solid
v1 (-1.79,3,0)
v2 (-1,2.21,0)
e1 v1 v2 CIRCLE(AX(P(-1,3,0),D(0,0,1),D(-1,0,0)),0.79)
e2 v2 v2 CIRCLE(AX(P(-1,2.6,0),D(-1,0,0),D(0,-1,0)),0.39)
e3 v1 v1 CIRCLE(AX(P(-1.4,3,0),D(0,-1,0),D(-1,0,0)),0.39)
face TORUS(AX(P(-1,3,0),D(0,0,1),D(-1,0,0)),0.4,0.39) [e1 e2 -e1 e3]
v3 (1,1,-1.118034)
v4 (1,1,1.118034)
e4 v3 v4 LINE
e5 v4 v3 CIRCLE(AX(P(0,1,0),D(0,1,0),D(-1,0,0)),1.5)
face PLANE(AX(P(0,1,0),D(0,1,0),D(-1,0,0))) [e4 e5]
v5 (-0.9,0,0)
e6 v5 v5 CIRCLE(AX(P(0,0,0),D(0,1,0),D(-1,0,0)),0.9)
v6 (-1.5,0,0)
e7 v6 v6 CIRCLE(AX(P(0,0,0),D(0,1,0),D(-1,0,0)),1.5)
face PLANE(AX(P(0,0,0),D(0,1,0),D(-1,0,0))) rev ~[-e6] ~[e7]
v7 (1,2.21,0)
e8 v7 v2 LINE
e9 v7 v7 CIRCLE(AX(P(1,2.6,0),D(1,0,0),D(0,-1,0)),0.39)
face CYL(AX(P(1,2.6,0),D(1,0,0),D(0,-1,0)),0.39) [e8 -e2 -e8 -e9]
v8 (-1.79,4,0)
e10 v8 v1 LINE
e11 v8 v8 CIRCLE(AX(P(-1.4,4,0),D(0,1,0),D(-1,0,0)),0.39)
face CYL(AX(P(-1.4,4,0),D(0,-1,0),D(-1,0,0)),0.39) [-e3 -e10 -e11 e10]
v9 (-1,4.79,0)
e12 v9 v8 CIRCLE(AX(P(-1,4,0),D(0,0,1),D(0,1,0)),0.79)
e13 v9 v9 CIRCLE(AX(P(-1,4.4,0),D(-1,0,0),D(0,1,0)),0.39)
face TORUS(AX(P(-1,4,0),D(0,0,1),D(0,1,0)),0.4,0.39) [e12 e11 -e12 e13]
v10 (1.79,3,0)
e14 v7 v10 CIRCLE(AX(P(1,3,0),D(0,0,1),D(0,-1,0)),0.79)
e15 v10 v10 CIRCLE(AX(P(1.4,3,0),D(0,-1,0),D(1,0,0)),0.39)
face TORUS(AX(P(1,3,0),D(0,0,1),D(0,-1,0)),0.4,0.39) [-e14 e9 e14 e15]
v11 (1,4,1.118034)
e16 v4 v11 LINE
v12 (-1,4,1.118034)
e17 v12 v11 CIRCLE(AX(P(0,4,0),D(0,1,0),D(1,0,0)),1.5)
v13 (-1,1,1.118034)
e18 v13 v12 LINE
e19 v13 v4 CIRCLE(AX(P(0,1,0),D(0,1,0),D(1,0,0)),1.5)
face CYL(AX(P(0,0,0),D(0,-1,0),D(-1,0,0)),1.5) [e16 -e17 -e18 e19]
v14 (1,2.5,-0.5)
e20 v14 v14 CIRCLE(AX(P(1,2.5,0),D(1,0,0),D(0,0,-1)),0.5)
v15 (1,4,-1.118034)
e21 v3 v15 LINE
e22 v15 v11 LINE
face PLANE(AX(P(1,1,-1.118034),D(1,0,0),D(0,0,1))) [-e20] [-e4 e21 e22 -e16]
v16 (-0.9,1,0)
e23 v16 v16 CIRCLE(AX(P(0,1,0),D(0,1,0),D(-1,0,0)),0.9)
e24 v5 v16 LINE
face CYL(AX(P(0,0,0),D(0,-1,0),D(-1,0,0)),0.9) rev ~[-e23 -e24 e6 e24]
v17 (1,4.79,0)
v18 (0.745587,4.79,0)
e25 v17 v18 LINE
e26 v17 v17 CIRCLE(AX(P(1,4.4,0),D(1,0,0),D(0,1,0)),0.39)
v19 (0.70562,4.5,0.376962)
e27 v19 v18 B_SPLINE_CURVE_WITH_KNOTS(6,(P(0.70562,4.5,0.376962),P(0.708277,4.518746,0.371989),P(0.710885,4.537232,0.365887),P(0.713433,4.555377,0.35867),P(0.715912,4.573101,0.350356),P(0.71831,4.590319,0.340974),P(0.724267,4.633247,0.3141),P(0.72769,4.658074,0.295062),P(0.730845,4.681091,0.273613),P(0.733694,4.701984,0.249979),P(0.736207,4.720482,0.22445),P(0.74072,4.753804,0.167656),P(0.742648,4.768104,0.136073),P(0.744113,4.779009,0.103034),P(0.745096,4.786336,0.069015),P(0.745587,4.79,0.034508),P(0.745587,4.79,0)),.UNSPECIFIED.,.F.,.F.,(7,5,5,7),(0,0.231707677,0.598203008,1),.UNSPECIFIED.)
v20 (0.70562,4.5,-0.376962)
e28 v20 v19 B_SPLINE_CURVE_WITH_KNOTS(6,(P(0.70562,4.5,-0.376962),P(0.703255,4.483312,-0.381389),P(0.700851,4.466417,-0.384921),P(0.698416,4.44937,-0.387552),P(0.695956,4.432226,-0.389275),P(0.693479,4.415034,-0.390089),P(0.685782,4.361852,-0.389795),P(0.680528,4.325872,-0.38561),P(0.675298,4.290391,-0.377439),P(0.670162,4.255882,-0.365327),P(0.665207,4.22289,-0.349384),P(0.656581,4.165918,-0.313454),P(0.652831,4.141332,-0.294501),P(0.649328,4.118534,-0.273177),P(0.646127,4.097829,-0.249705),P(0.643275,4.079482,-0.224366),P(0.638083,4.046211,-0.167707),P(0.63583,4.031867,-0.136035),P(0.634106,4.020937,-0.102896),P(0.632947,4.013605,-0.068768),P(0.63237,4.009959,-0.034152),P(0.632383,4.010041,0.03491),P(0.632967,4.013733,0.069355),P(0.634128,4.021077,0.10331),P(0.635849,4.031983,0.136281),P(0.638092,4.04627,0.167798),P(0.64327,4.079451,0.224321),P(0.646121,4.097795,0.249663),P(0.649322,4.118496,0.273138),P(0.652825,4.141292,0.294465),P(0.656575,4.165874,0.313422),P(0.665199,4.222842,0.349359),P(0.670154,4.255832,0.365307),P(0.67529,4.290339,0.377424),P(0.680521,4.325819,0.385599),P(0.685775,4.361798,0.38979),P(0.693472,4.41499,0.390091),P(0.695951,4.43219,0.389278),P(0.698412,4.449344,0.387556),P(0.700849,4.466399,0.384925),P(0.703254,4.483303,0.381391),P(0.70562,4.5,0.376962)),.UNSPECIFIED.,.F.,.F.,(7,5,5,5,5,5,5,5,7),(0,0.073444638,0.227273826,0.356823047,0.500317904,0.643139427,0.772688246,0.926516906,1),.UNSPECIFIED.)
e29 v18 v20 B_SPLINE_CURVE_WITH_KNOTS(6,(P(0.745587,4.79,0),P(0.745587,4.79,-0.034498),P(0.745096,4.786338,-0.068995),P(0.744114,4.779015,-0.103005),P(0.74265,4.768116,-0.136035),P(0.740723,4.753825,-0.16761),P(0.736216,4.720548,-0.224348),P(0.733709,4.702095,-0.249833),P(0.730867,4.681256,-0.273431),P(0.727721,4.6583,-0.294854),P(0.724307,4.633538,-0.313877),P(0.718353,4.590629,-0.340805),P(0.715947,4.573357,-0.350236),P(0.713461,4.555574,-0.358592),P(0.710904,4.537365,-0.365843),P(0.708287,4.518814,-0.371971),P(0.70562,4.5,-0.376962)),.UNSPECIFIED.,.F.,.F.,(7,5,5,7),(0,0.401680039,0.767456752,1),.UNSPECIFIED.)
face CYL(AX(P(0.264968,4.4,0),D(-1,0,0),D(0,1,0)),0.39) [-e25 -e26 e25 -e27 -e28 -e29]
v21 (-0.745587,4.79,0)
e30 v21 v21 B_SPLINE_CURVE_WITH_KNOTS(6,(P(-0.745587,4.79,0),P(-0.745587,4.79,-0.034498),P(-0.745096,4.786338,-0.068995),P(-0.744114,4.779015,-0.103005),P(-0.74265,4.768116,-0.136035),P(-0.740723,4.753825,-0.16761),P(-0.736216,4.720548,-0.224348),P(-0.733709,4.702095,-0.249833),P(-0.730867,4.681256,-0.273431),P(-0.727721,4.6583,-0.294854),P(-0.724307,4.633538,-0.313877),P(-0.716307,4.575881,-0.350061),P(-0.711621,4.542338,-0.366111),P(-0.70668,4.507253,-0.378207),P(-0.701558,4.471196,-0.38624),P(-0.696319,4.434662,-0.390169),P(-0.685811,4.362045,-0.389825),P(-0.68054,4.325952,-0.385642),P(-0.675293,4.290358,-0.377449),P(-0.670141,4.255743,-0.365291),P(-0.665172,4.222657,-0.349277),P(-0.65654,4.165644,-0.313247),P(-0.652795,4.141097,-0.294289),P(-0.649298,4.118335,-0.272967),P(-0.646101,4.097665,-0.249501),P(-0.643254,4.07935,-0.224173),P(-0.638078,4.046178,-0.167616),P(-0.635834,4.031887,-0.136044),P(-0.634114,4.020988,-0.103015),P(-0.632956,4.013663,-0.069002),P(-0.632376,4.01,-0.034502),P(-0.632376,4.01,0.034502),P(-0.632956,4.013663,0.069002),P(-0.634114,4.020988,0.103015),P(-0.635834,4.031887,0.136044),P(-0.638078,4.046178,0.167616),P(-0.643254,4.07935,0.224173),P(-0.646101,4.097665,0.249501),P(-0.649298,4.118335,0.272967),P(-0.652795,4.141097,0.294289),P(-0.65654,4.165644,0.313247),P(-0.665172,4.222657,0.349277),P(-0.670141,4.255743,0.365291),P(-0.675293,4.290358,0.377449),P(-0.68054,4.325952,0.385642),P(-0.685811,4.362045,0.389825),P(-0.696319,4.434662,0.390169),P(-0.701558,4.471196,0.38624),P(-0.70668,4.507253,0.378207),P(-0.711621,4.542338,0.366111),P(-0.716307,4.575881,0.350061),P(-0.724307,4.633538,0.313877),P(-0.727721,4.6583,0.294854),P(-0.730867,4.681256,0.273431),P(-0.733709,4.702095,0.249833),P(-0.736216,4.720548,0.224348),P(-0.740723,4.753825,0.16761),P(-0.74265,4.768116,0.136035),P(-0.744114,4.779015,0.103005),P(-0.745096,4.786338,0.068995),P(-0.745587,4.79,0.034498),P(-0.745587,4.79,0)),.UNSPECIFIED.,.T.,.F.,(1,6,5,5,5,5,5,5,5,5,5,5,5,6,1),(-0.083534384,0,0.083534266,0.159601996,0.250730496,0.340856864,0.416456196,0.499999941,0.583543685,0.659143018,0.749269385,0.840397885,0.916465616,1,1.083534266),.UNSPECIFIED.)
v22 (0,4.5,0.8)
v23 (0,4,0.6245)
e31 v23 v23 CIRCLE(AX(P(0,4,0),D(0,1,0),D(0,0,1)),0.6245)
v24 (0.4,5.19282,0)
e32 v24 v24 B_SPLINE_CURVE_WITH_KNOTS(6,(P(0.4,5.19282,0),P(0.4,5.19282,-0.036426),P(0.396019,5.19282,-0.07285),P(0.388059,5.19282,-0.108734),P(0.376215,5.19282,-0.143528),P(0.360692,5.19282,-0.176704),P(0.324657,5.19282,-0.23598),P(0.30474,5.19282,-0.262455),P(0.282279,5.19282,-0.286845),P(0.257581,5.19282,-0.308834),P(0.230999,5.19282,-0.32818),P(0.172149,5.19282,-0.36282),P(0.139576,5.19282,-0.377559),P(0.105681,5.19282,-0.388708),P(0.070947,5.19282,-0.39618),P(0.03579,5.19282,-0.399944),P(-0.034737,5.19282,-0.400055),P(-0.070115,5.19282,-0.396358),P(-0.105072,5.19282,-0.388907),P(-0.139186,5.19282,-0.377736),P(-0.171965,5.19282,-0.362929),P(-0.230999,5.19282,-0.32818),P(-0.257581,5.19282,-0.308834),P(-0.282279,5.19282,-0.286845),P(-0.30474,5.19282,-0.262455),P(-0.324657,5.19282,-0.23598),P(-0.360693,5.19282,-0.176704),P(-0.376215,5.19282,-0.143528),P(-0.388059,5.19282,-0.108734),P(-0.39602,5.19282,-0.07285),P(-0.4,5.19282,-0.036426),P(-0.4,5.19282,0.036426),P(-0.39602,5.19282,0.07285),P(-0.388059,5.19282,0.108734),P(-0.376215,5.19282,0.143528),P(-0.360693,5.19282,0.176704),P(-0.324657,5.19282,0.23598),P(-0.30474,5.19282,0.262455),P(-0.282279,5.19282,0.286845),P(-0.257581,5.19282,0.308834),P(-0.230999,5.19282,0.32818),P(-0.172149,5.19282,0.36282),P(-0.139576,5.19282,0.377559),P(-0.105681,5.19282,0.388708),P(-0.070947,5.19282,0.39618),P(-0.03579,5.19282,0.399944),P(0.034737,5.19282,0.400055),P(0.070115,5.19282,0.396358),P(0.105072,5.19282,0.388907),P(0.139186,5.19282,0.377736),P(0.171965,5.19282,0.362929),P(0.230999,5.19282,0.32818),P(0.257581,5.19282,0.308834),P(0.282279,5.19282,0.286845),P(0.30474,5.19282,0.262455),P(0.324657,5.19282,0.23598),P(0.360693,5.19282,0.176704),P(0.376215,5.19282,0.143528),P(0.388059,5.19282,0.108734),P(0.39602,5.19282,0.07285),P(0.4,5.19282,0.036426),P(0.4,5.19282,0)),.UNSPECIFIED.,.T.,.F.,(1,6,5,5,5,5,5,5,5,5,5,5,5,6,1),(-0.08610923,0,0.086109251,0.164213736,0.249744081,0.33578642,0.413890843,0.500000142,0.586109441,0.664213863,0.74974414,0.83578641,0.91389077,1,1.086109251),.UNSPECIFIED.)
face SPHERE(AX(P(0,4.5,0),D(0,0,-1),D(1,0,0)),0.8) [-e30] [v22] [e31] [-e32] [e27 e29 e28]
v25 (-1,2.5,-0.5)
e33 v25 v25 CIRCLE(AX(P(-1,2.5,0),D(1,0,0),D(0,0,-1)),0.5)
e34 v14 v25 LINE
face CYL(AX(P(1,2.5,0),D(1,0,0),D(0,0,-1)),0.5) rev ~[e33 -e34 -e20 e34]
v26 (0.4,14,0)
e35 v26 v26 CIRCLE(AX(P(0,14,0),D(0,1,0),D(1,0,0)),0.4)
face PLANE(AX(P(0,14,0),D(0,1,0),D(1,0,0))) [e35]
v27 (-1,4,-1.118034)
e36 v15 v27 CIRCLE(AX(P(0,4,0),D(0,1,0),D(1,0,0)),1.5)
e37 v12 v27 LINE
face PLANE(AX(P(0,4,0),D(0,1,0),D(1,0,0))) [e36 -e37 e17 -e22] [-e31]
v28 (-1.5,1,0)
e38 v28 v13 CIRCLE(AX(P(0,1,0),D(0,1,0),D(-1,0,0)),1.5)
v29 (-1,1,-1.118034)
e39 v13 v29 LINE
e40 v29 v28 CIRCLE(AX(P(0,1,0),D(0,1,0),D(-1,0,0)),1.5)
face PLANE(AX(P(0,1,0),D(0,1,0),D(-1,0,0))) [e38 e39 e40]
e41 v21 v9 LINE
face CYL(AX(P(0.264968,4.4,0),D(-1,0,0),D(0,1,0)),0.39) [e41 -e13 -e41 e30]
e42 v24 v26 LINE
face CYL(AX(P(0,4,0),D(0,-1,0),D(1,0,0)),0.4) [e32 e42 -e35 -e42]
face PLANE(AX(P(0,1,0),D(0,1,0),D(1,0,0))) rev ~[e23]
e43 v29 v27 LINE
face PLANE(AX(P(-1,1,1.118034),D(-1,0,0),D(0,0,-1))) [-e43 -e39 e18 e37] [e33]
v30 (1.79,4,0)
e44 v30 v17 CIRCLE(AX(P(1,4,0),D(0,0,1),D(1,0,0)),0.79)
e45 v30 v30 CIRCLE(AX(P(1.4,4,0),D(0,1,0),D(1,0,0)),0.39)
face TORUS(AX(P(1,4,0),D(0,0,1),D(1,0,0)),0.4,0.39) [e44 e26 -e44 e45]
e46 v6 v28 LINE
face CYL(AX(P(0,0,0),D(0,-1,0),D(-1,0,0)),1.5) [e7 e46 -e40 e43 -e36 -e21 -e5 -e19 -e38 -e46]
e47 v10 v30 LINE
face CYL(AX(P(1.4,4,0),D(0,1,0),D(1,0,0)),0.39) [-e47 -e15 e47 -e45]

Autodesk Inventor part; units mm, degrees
ref_plane "YZ Plane" through (0, 0, 0) normal (1, 0, 0) x (0, 1, 0)
ref_plane "XZ Plane" through (0, 0, 0) normal (0, 1, 0) x (-1, 0, 0)
sketch "스케치2" plane through (0, 0, 0) normal (0, 1, 0) x (-1, 0, 0)
  circle A0 centre (0, 0) radius 1.5
  circle A1 centre (0, 0) radius 0.9
  dimension "d0" = 3
  dimension "d6" = 1.8
extrude "돌출1" add sketch "스케치2" along normal blind 1
sketch "스케치4" plane through (0, 1, 0) normal (0, 1, 0) x (1, 0, 0)
  line L0 (1, -3.1) -> (-1, -3.1)
  line L1 (-1, -3.1) -> (-1, 3.1)
  line L2 (-1, 3.1) -> (1, 3.1)
  line L3 (1, 3.1) -> (1, -3.1)
  line L4 (1, -3.1) -> (-1, 3.1) construction
  line L5 (-1, -3.1) -> (1, 3.1) construction
  circle A0 centre (0, 0) radius 1.5 projected
  point P0 (1, 1.118034)
  point P1 (-1, 1.118034)
  point P2 (-1, -1.118034)
  point P3 (1, -1.118034)
  dimension "d7" = 2
extrude "돌출5" add sketch "스케치4" along normal blind 3 contours A0 L1 L3
sketch "스케치6" plane through (1, 1, 1.118034) normal (1, 0, 0) x (0, 0, -1)
  circle A0 centre (1.118034, 1.5) radius 0.5
  line L0 (0, 3) -> (2.236068, 3)
  point P0 (1.118034, -1)
  dimension "d22" = 1
  dimension "d23" = 1.5
extrude "돌출6" cut sketch "스케치6" along normal through all both and the other way through all
sketch "Sketch7" plane through (0, 4, 0) normal (0, 1, 0) x (1, 0, 0)
  circle A0 centre (0, 0) radius 0.4
  dimension "d26" = 0.8
extrude "Extrusion7" add sketch "Sketch7" along normal blind 10
sketch "Sketch8" plane through (0, 0, 0) normal (0, 0, 1) x (1, 0, 0)
  line L0 (0.264968, 4.4) -> (-1, 4.4)
  line L1 (-1.4, 4) -> (-1.4, 3)
  line L2 (-1, 2.6) -> (0.264968, 2.6)
  line L3 (1, 4) -> (-1, 4)
  line L4 (0.264968, 4.4) -> (1, 4.4)
  line L5 (1.4, 4) -> (1.4, 3)
  line L6 (1, 2.6) -> (0.264968, 2.6)
  line L7 (1, 1) -> (1, 4)
  line L8 (-1, 1) -> (-1, 4)
  arc A0 (-1, 4.4) -> (-1.4, 4) centre (-1, 4) ccw
  arc A1 (1.4, 4) -> (1, 4.4) centre (1, 4) ccw
  line L9 (-1, 3) -> (1, 3)
  arc A2 (-1.4, 3) -> (-1, 2.6) centre (-1, 3) ccw
  arc A3 (1, 2.6) -> (1.4, 3) centre (1, 3) ccw
  point P0 (0, 0)
  dimension "d29" = 0.4
  dimension "d30" = 1.4
  dimension "d32" = 0.4
  dimension "d33" = 0.4
sketch "Sketch9" plane through (0, 0, 0) normal (1, 0, 0) x (0, 1, 0)
  circle A0 centre (4.4, 0) radius 0.39
  line L0 (14, -0.4) -> (14, 0.4) projected
  line L1 (4, 0.4) -> (4, -0.4) projected
  point P0 (0, 0)
  dimension "d34" = 0.78
sweep "Sweep1" add profiles "Sketch9" path "Sketch8" path curves L0 A0 L1 A2 L2 L6 A3 L5 A1 L4
ref_plane "Work Plane2" through (0, 4.5, 0) normal (0, 1, 0) x (1, 0, 0)
sketch "Sketch11" plane through (0, 4.5, 0) normal (0, 1, 0) x (1, 0, 0)
  circle A0 centre (0, 0) radius 0.9 projected
  circle A1 centre (0, 0) radius 0.8
  line L0 (0, -0.8) -> (0, 0.8)
  dimension "d40" = 1.6
sketch "Sketch11 outline for Revolution2" plane through (0, 4.5, 0) normal (0, 1, 0) x (1, 0, 0)
  line L0 (0, 0.8) -> (0, -0.8)
  arc A0 (0, -0.8) -> (0, 0.8) centre (0, 0) ccw
revolve "Revolution2" add sketch "Sketch11 outline for Revolution2" angle 360 about axis through (0, 4.5, 0.8) along (0, 0, -1)
properties part number "dummy_anchor_end_3.0mm_w_string"
